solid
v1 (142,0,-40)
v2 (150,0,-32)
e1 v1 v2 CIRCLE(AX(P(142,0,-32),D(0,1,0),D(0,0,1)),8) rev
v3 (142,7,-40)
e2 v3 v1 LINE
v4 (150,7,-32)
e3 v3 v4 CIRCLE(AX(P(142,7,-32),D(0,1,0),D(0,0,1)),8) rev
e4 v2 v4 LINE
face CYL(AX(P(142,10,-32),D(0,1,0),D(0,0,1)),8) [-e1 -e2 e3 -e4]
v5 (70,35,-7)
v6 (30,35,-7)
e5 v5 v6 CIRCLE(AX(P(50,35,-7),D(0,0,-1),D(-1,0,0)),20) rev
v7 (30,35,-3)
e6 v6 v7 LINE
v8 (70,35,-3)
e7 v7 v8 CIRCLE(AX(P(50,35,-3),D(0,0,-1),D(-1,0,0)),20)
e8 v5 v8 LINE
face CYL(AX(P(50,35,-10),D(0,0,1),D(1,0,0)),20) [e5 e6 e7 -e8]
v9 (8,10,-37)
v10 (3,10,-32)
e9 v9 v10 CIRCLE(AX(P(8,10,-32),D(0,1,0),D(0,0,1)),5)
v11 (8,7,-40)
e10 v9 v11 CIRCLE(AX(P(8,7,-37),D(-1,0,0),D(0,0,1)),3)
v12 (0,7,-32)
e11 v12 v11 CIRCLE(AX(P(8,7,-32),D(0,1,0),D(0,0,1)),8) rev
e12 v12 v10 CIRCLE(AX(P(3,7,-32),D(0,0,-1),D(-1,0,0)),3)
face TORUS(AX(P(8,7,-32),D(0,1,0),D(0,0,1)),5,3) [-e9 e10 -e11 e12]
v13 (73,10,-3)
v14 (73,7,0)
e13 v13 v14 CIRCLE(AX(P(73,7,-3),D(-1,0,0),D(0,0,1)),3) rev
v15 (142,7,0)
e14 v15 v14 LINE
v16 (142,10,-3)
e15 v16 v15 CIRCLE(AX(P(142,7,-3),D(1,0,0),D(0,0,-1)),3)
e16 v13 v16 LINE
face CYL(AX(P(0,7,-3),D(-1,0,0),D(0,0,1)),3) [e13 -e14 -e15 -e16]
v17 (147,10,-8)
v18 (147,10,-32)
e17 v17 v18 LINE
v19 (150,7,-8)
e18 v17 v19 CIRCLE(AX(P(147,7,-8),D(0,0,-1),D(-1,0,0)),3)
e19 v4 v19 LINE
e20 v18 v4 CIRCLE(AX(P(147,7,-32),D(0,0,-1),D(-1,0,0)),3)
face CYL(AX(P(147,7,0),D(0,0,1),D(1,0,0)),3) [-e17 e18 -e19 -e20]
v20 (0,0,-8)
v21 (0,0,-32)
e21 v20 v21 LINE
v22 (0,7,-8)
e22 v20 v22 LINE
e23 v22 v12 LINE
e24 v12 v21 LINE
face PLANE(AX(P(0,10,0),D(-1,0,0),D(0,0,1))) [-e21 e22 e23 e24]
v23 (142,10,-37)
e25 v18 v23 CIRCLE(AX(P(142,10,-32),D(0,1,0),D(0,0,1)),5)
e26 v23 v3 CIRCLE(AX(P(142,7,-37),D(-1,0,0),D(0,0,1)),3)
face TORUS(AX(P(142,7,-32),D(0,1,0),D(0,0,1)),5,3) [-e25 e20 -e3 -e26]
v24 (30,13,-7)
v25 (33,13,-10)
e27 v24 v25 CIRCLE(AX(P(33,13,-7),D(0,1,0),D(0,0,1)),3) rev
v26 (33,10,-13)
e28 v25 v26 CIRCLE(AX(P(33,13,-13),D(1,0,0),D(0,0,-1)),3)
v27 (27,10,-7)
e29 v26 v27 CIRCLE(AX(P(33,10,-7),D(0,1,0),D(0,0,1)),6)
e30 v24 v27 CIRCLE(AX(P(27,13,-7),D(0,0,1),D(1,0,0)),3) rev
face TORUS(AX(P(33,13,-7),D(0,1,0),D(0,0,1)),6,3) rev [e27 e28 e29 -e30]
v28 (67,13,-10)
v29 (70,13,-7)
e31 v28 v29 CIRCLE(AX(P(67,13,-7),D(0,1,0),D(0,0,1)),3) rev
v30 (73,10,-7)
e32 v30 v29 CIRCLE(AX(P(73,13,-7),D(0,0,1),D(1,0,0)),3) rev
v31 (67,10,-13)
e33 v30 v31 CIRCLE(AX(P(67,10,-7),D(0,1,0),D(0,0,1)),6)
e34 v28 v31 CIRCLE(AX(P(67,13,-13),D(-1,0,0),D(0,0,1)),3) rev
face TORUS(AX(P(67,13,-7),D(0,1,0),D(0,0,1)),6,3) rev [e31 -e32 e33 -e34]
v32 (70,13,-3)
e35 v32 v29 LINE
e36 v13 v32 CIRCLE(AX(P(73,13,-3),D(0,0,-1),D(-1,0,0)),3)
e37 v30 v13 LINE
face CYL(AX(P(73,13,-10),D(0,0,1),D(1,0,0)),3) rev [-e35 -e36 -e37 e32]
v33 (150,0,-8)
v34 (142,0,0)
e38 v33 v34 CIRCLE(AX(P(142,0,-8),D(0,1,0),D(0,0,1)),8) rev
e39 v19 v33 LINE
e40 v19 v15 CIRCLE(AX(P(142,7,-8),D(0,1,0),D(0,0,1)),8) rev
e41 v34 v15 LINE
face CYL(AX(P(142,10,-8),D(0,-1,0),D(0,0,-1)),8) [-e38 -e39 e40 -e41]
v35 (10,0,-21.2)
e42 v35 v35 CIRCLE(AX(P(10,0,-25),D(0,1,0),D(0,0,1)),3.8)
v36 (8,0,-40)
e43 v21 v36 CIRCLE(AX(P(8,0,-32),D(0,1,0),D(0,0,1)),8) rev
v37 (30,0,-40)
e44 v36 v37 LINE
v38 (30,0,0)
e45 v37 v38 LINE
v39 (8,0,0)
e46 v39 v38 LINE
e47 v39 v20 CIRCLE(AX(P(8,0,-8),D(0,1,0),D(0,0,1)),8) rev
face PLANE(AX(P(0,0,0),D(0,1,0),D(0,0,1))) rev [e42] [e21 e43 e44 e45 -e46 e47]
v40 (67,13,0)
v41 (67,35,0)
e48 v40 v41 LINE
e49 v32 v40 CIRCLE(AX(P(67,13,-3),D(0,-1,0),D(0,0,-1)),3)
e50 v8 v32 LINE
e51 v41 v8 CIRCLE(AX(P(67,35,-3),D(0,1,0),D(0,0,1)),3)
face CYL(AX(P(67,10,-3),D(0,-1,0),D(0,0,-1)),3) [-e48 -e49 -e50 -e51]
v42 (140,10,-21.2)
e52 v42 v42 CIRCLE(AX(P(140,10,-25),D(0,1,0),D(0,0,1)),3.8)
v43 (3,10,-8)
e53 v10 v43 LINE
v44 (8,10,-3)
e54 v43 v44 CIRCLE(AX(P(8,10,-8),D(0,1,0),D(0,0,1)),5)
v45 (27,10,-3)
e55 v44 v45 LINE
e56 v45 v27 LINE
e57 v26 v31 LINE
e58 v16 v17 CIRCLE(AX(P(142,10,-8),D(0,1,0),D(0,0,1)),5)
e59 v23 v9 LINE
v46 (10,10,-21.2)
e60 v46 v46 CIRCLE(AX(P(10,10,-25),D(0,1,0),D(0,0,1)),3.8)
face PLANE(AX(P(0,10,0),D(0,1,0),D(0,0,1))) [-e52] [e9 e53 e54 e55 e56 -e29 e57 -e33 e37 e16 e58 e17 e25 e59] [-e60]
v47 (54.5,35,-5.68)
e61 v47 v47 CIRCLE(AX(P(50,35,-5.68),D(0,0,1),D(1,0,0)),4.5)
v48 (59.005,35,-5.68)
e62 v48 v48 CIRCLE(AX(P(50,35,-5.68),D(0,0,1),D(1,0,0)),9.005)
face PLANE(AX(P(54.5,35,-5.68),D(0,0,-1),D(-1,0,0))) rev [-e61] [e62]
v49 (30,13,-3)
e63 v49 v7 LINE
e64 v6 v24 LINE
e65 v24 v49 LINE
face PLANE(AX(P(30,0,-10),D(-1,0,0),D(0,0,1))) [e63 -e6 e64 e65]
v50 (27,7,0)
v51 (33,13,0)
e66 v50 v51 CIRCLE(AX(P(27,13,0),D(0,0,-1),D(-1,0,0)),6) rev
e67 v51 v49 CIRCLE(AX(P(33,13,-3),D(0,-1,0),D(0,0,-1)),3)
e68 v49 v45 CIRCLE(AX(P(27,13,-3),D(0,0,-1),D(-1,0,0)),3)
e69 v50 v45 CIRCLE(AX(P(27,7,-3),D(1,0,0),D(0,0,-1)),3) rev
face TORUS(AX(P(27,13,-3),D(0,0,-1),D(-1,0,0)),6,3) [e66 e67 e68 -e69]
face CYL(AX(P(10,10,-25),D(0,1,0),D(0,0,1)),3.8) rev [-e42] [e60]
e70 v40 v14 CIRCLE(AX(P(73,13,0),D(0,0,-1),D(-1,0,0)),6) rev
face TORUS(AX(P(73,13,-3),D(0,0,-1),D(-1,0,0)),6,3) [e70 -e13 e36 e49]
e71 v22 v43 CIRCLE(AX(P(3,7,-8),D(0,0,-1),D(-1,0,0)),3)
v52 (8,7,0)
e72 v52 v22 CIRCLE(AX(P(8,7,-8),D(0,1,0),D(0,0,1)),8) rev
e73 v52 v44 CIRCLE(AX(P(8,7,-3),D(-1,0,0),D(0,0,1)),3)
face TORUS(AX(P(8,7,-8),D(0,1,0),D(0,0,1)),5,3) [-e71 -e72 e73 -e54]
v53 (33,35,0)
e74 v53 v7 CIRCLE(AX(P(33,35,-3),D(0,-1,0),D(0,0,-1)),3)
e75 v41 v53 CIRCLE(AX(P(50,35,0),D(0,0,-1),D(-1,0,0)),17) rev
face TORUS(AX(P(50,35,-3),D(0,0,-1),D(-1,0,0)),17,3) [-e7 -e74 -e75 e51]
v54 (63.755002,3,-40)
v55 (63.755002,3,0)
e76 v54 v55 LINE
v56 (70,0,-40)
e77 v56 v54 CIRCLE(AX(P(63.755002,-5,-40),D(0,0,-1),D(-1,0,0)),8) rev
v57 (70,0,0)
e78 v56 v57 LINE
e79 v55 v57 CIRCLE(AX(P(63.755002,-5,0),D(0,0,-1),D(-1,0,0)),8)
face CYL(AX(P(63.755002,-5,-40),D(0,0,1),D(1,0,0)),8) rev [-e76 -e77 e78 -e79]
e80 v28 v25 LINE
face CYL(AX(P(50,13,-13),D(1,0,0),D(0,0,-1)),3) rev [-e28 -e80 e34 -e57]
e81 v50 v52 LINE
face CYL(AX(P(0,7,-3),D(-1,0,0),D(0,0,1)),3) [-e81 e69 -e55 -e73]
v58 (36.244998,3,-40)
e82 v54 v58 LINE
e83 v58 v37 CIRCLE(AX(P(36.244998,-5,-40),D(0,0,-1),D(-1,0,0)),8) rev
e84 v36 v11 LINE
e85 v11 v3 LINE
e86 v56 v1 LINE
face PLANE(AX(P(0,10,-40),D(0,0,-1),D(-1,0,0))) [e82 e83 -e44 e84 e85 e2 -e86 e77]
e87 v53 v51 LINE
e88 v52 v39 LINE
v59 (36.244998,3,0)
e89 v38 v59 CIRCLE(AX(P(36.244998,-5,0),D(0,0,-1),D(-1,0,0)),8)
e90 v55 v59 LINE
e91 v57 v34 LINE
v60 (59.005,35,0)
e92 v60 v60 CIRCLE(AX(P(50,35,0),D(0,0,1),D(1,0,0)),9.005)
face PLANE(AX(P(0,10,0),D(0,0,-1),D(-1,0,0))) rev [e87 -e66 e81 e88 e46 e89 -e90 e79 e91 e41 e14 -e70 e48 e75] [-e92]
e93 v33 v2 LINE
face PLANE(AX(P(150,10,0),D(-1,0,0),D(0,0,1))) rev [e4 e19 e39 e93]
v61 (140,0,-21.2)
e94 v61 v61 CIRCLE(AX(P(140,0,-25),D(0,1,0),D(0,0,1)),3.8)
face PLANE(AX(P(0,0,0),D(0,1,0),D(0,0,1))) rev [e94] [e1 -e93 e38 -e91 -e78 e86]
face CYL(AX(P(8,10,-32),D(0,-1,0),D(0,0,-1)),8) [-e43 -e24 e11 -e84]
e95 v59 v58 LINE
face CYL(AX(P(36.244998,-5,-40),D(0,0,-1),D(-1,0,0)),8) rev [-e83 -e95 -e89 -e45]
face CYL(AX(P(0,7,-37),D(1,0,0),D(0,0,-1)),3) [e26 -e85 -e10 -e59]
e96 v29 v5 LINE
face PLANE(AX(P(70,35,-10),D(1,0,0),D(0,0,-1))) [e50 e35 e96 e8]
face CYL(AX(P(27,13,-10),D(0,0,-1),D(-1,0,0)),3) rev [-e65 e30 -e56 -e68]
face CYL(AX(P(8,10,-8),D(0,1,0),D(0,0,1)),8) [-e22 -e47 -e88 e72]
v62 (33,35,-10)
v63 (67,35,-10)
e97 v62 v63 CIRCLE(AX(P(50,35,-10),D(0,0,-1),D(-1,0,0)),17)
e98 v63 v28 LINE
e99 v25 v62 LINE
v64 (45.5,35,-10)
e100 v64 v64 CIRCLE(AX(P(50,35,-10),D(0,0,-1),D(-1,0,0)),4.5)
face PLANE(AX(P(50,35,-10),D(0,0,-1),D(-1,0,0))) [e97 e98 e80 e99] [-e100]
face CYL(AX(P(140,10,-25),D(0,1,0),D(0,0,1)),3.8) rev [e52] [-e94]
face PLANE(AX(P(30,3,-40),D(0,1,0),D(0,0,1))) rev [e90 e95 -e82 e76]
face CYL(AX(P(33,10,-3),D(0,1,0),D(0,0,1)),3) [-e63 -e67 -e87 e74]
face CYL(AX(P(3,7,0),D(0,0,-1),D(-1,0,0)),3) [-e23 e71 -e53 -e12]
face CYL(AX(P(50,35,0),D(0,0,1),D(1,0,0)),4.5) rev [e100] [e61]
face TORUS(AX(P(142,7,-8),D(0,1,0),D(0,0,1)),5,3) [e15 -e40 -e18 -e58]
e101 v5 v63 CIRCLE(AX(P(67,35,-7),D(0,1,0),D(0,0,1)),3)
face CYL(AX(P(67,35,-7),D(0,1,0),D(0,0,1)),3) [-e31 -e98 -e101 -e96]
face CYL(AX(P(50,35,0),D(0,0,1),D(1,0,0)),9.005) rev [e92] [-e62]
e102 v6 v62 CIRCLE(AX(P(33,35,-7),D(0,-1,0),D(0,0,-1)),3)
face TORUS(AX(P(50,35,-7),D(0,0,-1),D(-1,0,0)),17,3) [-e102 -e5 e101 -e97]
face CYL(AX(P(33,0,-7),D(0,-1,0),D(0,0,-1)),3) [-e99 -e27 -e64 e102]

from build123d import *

# Parameters (mm, degrees)
CROQUIS1_W                                           = 150
CROQUIS1_H                                           = 40
SALIENTE_EXTRUIR1_DEPTH                              = 10
SALIENTE_EXTRUIR2_DEPTH                              = 10
CROQUIS3_W                                           = 40
CROQUIS3_H                                           = 3
CORTAR_EXTRUIR1_DEPTH                                = 165.69669092
REFRENTADO_PARA_PERNO_CON_CABEZA_HEXAGON_D           = 9
REFRENTADO_PARA_PERNO_CON_CABEZA_HEXAGON_CBORE_D     = 18.01
REFRENTADO_PARA_PERNO_CON_CABEZA_HEXAGON_CBORE_DEPTH = 5.68
REDONDEO1_R                                          = 8
REDONDEO2_R                                          = 8
REDONDEO3_R                                          = 3
TALADRO_DE_MARGEN_PARA_M71_D                         = 7.6


with BuildPart() as part:
    # Croquis1 → Saliente-Extruir1 (new body)
    with BuildSketch(Plane(origin=(0, 0, 0), x_dir=(1, 0, 0), z_dir=(0, 1, 0))):
        with Locations((75, 20)):
            Rectangle(CROQUIS1_W, CROQUIS1_H)
    extrude(amount=SALIENTE_EXTRUIR1_DEPTH)

    # Croquis2 → Saliente-Extruir2 (add)
    with BuildSketch(Plane.XY):
        with BuildLine():
            Line((30, 0), (30, 35))
            ThreePointArc((30, 35), (50, 55), (70, 35))
            Line((70, 35), (70, 0))
            Line((70, 0), (30, 0))
        make_face()
    extrude(amount=-SALIENTE_EXTRUIR2_DEPTH)

    # Croquis3 → Cortar-Extruir1 (cut, through all)
    with BuildSketch(Plane.XY):
        with Locations((50, 1.5)):
            Rectangle(CROQUIS3_W, CROQUIS3_H)
    extrude(amount=-CORTAR_EXTRUIR1_DEPTH, mode=Mode.SUBTRACT)

    # Refrentado para perno con cabeza hexagonal de M81 (through all)
    with Locations(Plane.XY):
        with Locations((50, 35)):
            CounterBoreHole(REFRENTADO_PARA_PERNO_CON_CABEZA_HEXAGON_D / 2, REFRENTADO_PARA_PERNO_CON_CABEZA_HEXAGON_CBORE_D / 2, REFRENTADO_PARA_PERNO_CON_CABEZA_HEXAGON_CBORE_DEPTH)

    # Redondeo1
    # the kernel refuses this fillet: 8 mm, written as the material it adds along each edge
    with BuildSketch(Plane(origin=(70, 3, 0), x_dir=(-1, 0, 0), z_dir=(0, 0, -1))) as redondeo1_piece_1:
        with BuildLine():
            CenterArc((6.244997998, -8), REDONDEO1_R, 90, 51.317812547)
            Line((0, -3), (-0.12489996, -2.9))
            ThreePointArc((-0.12489996, -2.9), (-0.16, -1.5), (-0.16, 0))
            Line((-0.16, 0), (0, 0.16))
            Line((0, 0.16), (6.244997998, 0.16))
            Line((6.244997998, 0.16), (6.244997998, 0))
        make_face()
    extrude(amount=40)
    with BuildSketch(Plane(origin=(30, 3, 0), x_dir=(0, -1, 0), z_dir=(0, 0, -1))) as redondeo1_piece_2:
        with BuildLine():
            CenterArc((8, -6.244997998), REDONDEO1_R, 128.682187453, 51.317812547)
            Line((0, -6.244997998), (-0.16, -6.244997998))
            Line((-0.16, -6.244997998), (-0.16, 0))
            Line((-0.16, 0), (0, 0.16))
            ThreePointArc((0, 0.16), (1.5, 0.16), (2.9, 0.12489996))
            Line((2.9, 0.12489996), (3, 0))
        make_face()
    extrude(amount=40)

    # Redondeo2
    redondeo2_edges = [part.edges().sort_by_distance(p)[0] for p in [
        (0, 5, -40),
        (0, 5, 0),
        (150, 5, 0),
        (150, 5, -40),
    ]]
    fillet(redondeo2_edges, radius=REDONDEO2_R)

    # Redondeo3
    redondeo3_edges = [part.edges().sort_by_distance(p)[0] for p in [
        (106, 10, 0),
        (30, 22.5, -10),
        (30, 10, -5),
        (50, 55, -10),
        (70, 10, -5),
        (70, 22.5, -10),
        (50, 10, -10),
        (70, 22.5, 0),
        (50, 55, 0),
        (30, 22.5, 0),
        (150, 10, -20),
        (19, 10, 0),
        (75, 10, -40),
        (0, 10, -20),
        (2.343145751, 10, -2.343145751),
        (2.343145751, 10, -37.656854249),
        (147.656854249, 10, -37.656854249),
        (147.656854249, 10, -2.343145751),
    ]]
    fillet(redondeo3_edges, radius=REDONDEO3_R)

    # Taladro de margen para M71 (through all)
    with Locations(Plane(origin=(0, 10, 0), x_dir=(1, 0, 0), z_dir=(0, 1, 0))):
        with Locations((140, 25), (10, 25)):
            Hole(TALADRO_DE_MARGEN_PARA_M71_D / 2)


solid = part.part
